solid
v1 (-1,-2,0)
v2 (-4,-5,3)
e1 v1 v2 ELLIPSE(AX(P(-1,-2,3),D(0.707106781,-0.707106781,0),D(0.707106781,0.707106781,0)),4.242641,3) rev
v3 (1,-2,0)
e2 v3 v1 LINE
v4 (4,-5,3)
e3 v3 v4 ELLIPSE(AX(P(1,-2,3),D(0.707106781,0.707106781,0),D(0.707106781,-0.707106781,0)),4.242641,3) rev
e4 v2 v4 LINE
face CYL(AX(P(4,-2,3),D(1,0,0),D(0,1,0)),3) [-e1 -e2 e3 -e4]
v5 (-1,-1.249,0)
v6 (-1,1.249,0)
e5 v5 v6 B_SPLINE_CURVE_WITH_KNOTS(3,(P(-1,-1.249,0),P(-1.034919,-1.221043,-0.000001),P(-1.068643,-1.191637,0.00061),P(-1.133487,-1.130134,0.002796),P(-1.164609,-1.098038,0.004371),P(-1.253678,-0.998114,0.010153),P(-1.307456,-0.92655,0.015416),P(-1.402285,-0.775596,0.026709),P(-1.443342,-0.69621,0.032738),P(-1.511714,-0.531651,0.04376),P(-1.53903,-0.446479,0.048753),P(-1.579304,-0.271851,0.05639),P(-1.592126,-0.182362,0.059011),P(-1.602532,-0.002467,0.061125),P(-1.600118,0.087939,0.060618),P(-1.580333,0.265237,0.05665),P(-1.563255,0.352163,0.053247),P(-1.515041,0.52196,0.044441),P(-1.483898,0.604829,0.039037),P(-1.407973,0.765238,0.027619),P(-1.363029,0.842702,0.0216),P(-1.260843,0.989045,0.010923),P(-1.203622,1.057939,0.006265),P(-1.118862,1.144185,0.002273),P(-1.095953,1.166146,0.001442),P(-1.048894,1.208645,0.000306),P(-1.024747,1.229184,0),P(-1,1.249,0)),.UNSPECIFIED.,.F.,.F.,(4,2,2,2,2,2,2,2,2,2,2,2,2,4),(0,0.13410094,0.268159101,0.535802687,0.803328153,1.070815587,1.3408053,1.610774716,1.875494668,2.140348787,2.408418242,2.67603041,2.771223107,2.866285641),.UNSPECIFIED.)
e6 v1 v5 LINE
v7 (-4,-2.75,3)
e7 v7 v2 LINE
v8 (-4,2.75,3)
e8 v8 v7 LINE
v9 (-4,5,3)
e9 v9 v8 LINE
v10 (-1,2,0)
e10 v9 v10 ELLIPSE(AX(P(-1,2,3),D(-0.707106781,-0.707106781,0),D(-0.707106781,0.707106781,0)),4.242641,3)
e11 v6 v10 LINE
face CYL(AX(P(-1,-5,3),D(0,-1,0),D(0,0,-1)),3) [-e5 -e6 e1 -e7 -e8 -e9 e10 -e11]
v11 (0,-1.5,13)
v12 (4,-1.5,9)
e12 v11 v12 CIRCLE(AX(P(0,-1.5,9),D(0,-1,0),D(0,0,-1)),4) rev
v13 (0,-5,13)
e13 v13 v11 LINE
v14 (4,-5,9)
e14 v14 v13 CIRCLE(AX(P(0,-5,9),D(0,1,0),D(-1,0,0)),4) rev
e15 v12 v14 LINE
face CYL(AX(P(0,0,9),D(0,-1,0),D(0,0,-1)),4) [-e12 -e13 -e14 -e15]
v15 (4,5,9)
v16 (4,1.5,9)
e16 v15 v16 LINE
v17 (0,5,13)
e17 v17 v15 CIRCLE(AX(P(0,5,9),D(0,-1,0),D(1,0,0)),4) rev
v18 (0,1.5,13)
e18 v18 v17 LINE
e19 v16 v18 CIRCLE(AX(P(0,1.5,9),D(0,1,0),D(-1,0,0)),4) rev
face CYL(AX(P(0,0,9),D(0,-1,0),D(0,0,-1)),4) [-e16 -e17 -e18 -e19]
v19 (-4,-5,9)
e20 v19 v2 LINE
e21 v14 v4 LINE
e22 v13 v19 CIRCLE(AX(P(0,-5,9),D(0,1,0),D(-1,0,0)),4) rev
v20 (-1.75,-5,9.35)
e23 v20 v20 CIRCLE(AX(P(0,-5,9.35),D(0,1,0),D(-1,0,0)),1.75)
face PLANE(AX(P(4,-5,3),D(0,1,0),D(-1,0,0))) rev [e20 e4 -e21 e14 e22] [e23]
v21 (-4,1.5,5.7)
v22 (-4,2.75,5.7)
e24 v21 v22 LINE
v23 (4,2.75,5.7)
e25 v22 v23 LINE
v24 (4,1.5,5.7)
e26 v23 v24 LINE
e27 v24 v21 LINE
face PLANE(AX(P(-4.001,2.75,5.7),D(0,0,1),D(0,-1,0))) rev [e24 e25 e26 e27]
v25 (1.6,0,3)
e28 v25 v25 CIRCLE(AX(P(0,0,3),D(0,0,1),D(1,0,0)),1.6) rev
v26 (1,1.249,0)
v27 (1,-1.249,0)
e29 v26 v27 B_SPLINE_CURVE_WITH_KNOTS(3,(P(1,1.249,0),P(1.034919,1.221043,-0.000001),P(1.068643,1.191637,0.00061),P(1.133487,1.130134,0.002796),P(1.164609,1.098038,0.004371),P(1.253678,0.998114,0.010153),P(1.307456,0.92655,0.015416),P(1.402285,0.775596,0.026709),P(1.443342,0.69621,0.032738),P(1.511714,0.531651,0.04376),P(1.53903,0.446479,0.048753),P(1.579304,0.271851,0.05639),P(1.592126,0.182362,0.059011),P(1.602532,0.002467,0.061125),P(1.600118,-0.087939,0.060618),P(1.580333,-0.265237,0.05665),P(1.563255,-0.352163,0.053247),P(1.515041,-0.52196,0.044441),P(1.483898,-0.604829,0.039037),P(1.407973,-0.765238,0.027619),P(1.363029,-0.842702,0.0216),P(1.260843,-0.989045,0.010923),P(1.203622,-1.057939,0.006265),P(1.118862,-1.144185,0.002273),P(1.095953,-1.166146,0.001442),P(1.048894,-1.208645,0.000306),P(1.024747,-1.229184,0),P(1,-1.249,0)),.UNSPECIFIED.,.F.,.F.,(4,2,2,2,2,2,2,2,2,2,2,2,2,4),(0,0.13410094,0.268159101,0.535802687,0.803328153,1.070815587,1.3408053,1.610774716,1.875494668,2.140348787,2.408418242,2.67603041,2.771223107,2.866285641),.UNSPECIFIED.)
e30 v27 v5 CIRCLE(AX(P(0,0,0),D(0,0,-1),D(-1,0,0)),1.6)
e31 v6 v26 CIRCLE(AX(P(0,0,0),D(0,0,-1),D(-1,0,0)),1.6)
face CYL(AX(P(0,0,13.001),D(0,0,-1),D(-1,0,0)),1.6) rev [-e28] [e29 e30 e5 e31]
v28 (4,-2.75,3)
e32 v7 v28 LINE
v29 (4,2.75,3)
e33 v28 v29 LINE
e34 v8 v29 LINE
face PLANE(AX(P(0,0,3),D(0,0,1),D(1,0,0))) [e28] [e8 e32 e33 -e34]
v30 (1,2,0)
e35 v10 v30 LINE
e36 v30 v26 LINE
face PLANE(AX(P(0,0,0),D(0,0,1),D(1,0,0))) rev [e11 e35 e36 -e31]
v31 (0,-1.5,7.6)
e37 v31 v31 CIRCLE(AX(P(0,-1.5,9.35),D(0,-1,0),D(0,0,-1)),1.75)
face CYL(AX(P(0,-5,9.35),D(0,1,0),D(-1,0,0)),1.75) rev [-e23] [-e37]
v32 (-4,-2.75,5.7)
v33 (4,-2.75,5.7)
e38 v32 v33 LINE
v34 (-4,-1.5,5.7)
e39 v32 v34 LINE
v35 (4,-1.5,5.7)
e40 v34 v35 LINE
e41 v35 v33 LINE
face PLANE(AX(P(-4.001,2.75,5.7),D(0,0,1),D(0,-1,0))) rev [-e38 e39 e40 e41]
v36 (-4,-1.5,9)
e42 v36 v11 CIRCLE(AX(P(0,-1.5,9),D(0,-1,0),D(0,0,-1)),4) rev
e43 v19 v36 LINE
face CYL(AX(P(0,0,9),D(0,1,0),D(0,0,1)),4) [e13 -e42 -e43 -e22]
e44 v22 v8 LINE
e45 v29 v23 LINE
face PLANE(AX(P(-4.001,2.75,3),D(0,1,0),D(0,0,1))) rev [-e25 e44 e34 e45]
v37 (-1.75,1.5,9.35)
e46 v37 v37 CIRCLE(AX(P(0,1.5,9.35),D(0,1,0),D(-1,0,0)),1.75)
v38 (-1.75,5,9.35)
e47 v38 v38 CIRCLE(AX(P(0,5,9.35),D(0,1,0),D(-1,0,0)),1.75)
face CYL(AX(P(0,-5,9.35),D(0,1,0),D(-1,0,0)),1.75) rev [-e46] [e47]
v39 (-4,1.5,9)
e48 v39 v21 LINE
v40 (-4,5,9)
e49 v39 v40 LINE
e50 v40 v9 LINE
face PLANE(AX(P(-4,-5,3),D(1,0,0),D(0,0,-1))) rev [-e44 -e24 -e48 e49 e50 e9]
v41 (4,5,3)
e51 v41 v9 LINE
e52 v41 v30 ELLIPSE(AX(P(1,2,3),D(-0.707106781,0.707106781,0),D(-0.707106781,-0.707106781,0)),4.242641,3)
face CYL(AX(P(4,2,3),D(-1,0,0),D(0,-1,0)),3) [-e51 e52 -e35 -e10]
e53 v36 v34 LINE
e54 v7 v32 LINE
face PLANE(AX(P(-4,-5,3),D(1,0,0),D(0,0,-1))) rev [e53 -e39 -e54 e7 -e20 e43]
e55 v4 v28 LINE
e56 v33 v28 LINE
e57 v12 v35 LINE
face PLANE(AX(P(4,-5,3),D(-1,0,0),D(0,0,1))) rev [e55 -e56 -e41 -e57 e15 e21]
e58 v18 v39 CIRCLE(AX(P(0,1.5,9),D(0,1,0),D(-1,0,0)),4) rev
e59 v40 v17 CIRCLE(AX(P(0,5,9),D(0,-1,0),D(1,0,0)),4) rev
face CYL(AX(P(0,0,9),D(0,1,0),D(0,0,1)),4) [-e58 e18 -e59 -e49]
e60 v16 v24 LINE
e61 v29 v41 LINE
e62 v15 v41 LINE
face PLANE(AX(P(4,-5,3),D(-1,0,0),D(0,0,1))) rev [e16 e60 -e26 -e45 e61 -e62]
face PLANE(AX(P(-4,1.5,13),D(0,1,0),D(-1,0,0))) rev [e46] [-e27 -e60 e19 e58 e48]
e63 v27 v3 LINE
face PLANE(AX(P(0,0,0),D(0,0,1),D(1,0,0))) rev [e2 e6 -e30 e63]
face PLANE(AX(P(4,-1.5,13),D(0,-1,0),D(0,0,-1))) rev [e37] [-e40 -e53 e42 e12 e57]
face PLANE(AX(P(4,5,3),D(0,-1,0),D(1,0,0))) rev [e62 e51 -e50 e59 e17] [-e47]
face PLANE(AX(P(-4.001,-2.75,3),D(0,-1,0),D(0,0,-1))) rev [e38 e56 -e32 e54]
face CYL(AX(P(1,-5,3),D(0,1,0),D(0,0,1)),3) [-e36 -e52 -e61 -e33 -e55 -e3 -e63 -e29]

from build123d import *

# Parameters (mm, degrees)
SKETCH1_W           = 8
SKETCH1_H           = 10
BOSS_EXTRUDE1_DEPTH = 3
SKETCH2_W           = 8
SKETCH2_H           = 3.5
BOSS_EXTRUDE2_DEPTH = 10
CUT_EXTRUDE1_START  = -8
SKETCH3_W           = 2.7
SKETCH3_H           = 5.5
CUT_EXTRUDE1_DEPTH  = 8
CUT_EXTRUDE2_REACH  = 16.491
SKETCH4_R           = 1.6
SKETCH5_R           = 1.75
CUT_EXTRUDE3_DEPTH  = 17.881943016
FILLET1_R           = 4
FILLET2_START       = -5
FILLET2_DEPTH       = 10
FILLET2_2_DEPTH     = 10


with BuildPart() as part:
    # Sketch1 → Boss-Extrude1 (new body)
    with BuildSketch(Plane.XY):
        Rectangle(SKETCH1_W, SKETCH1_H)
    extrude(amount=BOSS_EXTRUDE1_DEPTH)

    # Sketch2 → Boss-Extrude2 (add)
    with BuildSketch(Plane.XY.offset(3)):
        with Locations((0, 3.25)):
            Rectangle(SKETCH2_W, SKETCH2_H)
        with Locations((0, -3.25)):
            Rectangle(SKETCH2_W, SKETCH2_H)
    extrude(amount=BOSS_EXTRUDE2_DEPTH)

    # Sketch3 → Cut-Extrude1 (cut)
    with BuildSketch(Plane(origin=(4, 0, 0), x_dir=(0, 0, -1), z_dir=(1, 0, 0)).offset(CUT_EXTRUDE1_START)):
        with Locations((-4.35, 0)):
            Rectangle(SKETCH3_W, SKETCH3_H)
    extrude(amount=CUT_EXTRUDE1_DEPTH, mode=Mode.SUBTRACT)

    # Sketch4 → Cut-Extrude2 (cut, up to next)
    with BuildSketch(Plane(origin=(0, 0, 0), x_dir=(-1, 0, 0), z_dir=(0, 0, -1)), mode=Mode.PRIVATE) as cut_extrude2_sk1:
        Circle(SKETCH4_R)
    cut_extrude2_tool1 = extrude(cut_extrude2_sk1.sketch, amount=-CUT_EXTRUDE2_REACH, mode=Mode.PRIVATE) & part.part
    add(cut_extrude2_tool1.solids().sort_by_distance((0, 0, 0))[0], mode=Mode.SUBTRACT)

    # Sketch5 → Cut-Extrude3 (cut, through all)
    with BuildSketch(Plane(origin=(0, 5, 0), x_dir=(1, 0, 0), z_dir=(0, 1, 0))):
        with Locations(Location((0, -9.35, 0), (0, 0, 180))):
            Circle(SKETCH5_R)
    extrude(amount=-CUT_EXTRUDE3_DEPTH, mode=Mode.SUBTRACT)

    # Fillet1
    fillet1_edges = [part.edges().sort_by_distance(p)[0] for p in [
        (-4, -3.25, 13),
        (-4, 3.25, 13),
        (4, -3.25, 13),
        (4, 3.25, 13),
    ]]
    fillet(fillet1_edges, radius=FILLET1_R - 0.0001)  # a hair under: the kernel refuses the full size

    # Fillet2: read off the stored shape, not the designer's step
    # Fillet2 outline → Fillet2 (cut)
    with BuildSketch(Plane(origin=(0, 0, 0), x_dir=(1, 0, 0), z_dir=(0, 1, 0)).offset(FILLET2_START)):
        with BuildLine():
            ThreePointArc((-4, -3), (-3.121320344, -0.878679656), (-1, 0))
            Line((-1, 0), (-4, 0))
            Line((-4, 0), (-4, -3))
        make_face()
        with BuildLine():
            ThreePointArc((1, 0), (3.121320344, -0.878679656), (4, -3))
            Line((4, -3), (4, 0))
            Line((4, 0), (1, 0))
        make_face()
    extrude(amount=FILLET2_DEPTH, mode=Mode.SUBTRACT)

    # Fillet2 2 outline → Fillet2 2 (cut)
    with BuildSketch(Plane.YZ.offset(FILLET2_START)):
        with BuildLine():
            Line((5, 0), (5, 3))
            ThreePointArc((5, 3), (4.121320344, 0.878679656), (2, 0))
            Line((2, 0), (5, 0))
        make_face()
        with BuildLine():
            ThreePointArc((-2, 0), (-4.121320344, 0.878679656), (-5, 3))
            Line((-5, 3), (-5, 0))
            Line((-5, 0), (-2, 0))
        make_face()
    extrude(amount=FILLET2_2_DEPTH, mode=Mode.SUBTRACT)


solid = part.part
